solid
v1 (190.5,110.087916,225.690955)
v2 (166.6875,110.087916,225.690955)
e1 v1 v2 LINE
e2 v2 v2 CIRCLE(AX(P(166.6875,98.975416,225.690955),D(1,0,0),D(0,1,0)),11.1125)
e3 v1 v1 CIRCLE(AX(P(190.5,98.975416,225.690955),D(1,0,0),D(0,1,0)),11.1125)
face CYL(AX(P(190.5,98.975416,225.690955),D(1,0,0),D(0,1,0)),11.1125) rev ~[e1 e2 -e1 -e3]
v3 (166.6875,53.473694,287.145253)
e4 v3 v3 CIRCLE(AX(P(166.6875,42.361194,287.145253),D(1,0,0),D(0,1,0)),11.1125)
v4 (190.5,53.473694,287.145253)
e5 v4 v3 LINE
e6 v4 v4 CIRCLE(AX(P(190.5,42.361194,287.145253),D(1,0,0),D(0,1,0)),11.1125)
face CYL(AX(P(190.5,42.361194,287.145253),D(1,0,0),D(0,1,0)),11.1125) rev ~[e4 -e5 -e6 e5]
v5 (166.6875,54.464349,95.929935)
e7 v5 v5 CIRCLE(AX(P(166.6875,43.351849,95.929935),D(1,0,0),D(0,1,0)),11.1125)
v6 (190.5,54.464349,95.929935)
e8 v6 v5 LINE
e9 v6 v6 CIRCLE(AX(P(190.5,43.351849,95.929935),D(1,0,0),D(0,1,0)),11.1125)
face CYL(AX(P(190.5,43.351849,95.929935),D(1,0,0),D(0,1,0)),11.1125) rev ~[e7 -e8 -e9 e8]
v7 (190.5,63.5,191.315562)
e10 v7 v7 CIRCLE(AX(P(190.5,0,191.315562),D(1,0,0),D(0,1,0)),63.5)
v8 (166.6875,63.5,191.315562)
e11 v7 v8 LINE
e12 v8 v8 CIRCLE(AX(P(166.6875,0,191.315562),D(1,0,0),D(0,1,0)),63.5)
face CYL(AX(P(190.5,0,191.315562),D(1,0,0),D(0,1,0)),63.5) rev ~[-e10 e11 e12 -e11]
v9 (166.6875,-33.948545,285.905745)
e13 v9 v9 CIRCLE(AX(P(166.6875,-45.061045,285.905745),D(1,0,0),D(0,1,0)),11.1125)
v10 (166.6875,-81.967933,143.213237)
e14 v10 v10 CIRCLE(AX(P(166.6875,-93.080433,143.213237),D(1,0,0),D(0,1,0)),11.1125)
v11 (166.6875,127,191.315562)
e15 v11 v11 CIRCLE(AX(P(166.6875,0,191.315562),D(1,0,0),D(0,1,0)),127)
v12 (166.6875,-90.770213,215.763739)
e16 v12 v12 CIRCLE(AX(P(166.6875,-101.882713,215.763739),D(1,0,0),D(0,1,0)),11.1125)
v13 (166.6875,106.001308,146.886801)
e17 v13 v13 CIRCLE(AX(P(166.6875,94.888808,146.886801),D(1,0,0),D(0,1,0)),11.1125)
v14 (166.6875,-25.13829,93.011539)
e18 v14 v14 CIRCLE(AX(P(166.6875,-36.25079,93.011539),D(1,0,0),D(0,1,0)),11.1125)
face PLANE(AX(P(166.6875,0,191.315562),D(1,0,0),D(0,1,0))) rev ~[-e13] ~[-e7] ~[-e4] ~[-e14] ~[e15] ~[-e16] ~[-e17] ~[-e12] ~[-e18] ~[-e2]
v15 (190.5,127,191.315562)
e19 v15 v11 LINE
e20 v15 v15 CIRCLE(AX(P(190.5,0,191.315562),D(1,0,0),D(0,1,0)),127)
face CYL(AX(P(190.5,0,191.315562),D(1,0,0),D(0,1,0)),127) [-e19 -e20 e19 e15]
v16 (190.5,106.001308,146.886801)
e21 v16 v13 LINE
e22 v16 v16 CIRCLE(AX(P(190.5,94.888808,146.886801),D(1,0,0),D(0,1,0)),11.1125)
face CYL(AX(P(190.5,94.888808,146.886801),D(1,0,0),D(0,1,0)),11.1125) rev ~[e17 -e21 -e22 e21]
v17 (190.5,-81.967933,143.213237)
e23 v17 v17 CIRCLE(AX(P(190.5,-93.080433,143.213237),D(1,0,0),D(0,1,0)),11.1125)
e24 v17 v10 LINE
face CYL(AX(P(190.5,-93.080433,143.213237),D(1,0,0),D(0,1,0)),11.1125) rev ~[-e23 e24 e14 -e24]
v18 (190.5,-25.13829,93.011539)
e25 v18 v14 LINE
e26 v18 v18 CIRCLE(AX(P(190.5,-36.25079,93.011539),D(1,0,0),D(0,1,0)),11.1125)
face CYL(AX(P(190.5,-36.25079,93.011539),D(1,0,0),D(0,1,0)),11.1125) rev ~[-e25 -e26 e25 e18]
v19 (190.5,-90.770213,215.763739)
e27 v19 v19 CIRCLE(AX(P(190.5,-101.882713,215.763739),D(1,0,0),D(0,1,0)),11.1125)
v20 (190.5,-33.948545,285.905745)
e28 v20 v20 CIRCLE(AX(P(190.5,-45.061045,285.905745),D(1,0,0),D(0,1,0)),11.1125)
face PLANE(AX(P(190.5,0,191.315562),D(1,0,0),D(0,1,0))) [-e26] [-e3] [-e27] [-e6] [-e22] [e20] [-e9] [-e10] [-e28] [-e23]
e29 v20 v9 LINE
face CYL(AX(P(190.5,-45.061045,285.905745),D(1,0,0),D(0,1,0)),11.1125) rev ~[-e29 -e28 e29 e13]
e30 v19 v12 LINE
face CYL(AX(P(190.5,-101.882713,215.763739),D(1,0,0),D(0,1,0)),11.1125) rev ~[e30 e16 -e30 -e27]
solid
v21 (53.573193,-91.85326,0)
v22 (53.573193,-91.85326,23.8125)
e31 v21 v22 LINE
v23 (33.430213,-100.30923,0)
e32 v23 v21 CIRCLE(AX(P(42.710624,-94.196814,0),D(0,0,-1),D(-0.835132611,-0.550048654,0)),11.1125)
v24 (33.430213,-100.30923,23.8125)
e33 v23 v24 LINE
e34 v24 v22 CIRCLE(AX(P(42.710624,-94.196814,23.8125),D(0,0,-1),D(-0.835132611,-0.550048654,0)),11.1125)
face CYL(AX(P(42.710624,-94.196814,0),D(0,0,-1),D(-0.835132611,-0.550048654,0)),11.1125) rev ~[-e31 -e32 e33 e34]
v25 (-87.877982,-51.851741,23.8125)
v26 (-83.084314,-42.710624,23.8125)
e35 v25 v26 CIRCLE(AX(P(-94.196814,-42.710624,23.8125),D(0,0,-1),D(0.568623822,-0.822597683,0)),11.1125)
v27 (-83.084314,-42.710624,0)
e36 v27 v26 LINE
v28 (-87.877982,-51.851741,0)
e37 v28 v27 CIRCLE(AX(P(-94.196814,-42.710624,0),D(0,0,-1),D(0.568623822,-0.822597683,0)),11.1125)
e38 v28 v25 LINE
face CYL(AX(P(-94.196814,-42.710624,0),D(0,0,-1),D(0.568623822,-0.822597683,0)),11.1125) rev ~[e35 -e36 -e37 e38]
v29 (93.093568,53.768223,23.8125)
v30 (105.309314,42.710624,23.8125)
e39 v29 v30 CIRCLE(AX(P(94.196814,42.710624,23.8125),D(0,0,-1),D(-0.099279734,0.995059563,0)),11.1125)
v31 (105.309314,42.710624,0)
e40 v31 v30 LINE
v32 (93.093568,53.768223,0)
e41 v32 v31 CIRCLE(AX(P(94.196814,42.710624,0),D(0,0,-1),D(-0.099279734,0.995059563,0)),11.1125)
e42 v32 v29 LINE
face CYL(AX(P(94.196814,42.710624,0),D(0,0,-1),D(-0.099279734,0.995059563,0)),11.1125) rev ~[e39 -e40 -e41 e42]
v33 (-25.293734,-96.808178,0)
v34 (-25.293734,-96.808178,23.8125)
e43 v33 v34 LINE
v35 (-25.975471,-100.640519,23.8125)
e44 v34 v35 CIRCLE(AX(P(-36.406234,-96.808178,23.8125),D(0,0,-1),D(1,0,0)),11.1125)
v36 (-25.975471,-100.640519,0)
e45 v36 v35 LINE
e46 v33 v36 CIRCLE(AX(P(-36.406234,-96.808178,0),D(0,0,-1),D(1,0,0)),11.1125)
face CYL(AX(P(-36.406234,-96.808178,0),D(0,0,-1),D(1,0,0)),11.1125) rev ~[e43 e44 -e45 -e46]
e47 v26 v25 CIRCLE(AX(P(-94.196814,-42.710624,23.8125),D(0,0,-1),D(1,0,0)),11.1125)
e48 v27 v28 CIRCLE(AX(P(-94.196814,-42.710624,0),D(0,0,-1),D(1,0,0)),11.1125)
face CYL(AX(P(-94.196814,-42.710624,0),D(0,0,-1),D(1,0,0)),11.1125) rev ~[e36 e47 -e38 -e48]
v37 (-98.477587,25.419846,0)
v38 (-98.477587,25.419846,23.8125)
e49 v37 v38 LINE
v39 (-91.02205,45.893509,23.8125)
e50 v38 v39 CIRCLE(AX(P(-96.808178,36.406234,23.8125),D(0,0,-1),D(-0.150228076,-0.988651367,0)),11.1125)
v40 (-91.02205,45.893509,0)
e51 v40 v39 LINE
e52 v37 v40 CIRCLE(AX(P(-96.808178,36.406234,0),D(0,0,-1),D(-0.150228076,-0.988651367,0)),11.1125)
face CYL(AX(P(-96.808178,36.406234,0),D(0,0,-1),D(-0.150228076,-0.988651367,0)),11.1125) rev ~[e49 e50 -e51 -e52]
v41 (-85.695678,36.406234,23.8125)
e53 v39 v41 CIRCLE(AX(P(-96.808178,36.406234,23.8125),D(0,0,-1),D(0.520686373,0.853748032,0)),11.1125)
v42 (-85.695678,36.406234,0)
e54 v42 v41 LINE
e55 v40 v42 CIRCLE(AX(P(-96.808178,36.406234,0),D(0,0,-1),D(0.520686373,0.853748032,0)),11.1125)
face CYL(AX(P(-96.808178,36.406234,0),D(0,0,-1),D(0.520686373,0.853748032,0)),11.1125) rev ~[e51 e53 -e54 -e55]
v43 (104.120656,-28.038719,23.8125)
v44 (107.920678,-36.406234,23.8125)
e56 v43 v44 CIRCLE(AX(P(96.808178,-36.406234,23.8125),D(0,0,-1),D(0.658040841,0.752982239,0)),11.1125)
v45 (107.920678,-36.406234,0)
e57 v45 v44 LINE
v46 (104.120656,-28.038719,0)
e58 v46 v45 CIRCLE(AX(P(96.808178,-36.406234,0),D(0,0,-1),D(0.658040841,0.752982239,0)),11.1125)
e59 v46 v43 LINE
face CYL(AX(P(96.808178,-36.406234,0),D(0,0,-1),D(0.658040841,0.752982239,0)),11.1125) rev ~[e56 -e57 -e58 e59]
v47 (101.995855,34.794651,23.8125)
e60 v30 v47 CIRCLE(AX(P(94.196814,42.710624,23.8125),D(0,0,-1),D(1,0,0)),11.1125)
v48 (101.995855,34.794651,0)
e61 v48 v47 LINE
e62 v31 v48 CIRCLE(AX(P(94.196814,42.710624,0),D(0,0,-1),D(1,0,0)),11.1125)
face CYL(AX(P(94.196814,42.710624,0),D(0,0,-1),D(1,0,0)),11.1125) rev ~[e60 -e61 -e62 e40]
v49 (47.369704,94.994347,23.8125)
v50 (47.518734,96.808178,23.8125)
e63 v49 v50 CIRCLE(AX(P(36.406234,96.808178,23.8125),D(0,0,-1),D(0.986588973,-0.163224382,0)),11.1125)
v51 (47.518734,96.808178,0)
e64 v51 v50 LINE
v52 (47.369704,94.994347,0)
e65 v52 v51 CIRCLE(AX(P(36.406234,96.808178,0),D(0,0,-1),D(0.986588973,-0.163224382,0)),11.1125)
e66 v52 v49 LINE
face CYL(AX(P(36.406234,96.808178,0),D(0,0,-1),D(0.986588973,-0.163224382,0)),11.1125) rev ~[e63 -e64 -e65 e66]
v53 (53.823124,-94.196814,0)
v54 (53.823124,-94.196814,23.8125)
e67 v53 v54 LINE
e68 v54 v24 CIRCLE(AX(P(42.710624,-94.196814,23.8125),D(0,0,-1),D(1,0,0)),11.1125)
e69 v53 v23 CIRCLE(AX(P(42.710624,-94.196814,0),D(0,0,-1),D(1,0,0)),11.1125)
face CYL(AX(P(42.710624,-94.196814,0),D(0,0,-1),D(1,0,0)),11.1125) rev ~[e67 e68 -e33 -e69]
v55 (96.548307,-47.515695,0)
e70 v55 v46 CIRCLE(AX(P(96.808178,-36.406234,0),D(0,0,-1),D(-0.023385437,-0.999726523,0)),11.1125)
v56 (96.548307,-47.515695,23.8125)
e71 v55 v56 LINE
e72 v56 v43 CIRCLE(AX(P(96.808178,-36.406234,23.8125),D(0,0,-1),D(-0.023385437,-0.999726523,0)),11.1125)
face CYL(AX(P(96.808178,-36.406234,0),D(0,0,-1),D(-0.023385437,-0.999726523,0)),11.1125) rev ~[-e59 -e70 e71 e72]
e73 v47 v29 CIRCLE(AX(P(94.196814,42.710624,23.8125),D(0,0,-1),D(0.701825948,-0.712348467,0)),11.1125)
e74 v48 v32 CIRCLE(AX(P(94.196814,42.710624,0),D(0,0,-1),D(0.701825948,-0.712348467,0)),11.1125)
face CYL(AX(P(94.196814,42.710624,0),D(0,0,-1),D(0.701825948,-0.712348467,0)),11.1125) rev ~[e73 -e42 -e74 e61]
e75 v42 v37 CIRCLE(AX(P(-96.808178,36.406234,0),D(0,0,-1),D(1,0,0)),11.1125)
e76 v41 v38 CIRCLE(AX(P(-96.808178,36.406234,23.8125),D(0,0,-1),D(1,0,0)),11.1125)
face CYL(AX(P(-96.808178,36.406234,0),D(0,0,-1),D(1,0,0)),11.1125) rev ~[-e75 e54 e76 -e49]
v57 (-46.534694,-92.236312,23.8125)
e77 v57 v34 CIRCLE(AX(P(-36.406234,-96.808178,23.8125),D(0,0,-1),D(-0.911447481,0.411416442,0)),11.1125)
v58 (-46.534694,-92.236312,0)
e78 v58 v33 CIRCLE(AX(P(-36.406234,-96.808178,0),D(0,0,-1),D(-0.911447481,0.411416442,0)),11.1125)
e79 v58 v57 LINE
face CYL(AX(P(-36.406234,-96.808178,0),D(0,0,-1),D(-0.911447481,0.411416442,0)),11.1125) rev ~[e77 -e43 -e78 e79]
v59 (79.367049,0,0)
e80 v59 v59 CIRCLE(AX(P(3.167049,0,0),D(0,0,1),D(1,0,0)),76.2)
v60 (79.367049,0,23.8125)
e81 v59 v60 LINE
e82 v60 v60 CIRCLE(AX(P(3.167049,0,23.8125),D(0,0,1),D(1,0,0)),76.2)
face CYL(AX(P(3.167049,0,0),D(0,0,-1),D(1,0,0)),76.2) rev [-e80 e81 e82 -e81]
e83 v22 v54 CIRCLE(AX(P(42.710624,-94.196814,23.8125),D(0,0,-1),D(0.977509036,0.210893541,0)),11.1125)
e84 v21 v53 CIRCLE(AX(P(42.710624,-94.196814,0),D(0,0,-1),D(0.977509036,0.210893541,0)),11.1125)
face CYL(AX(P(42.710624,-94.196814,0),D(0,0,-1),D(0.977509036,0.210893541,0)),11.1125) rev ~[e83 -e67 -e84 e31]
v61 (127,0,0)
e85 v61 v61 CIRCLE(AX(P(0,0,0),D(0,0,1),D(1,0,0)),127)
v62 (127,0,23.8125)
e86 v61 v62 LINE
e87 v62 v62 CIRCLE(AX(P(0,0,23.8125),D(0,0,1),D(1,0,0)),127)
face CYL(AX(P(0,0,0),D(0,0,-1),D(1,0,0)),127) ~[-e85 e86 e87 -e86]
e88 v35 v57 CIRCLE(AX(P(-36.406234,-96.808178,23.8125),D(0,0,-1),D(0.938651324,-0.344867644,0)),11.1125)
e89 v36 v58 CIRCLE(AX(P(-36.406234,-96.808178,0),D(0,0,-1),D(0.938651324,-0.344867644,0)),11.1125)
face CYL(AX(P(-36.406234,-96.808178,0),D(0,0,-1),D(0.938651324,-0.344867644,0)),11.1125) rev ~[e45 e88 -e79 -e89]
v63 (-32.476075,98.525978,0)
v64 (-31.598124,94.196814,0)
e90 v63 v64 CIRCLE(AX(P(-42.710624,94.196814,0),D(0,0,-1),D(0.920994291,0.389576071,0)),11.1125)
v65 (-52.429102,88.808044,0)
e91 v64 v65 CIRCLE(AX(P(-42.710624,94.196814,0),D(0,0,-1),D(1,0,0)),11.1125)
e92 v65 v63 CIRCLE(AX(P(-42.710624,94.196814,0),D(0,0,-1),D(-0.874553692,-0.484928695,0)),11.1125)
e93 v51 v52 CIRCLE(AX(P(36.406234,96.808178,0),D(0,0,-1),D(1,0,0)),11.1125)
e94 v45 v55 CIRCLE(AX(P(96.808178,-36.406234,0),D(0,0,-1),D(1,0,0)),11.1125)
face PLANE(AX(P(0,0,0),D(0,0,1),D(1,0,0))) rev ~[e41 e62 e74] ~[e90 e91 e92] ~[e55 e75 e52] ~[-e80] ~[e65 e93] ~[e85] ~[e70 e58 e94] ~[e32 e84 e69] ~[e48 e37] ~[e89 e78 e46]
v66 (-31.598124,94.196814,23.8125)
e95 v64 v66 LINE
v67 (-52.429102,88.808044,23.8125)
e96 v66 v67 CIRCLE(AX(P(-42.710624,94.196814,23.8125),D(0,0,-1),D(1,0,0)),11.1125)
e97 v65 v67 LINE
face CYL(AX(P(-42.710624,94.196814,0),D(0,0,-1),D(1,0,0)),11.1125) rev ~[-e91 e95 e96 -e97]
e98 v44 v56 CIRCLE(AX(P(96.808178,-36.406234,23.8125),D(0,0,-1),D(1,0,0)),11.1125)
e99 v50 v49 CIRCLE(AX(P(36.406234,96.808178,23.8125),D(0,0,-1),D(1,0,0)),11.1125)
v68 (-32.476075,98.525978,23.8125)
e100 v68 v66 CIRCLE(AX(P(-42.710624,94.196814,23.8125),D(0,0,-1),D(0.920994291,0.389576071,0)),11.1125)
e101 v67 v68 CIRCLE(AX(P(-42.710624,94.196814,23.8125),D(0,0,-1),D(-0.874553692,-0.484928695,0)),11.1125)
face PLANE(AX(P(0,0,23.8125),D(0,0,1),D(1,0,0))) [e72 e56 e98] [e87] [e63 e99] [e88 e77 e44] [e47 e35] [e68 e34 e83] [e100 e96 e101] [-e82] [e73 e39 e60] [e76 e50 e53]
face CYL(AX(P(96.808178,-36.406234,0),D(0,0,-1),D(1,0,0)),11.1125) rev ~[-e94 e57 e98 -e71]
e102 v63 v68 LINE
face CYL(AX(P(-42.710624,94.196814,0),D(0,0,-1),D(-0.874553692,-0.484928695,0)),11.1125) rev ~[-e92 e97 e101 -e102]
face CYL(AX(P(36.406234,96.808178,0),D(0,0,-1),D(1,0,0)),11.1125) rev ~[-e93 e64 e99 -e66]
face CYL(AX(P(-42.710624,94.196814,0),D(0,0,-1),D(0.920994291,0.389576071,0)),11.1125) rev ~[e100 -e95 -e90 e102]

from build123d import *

# Parameters (mm, degrees)
F0_R     = 127
F0_R_2   = 76.2
F1_DEPTH = 23.8125
F4_R     = 127
F4_R_2   = 11.1125
F4_R_3   = 63.5
F5_DEPTH = 23.8125


# Not quite as in the source:
# - the program builds the solid bodies; features that only make, move or delete a surface that nothing else refers to are left out


with BuildPart() as f1:
    # F0 (on Top) → F1 (new body)
    with BuildSketch(Plane.XY):
        Circle(F0_R)
        with BuildLine():
            ThreePointArc((101.9958548396, 34.7946514115), (106.4448025713, 17.6495395986), (107.942049028, 0))
            ThreePointArc((107.942049028, 0), (106.9823052387, -14.1489647287), (104.120656465, -28.03871913))
            ThreePointArc((104.120656465, -28.03871913), (106.9261709336, -31.8112513898), (107.920677619, -36.4062342556))
            ThreePointArc((107.920677619, -36.4062342556), (104.5734800406, -44.3553055569), (96.548306946, -47.5156952454))
            ThreePointArc((96.548306946, -47.5156952454), (78.4010780991, -72.9221605187), (53.5731929065, -91.8532595192))
            ThreePointArc((53.5731929065, -91.8532595192), (53.7604643817, -93.0183920588), (53.8231237491, -94.1968139884))
            ThreePointArc((53.8231237491, -94.1968139884), (45.9011634738, -104.8414423292), (33.4302126102, -100.3092296601))
            ThreePointArc((33.4302126102, -100.3092296601), (3.751342164, -104.7733707892), (-25.9754714164, -100.6405193108))
            ThreePointArc((-25.9754714164, -100.6405193108), (-40.6110553172, -107.0944371963), (-46.5346943911, -92.2363124052))
            ThreePointArc((-46.5346943911, -92.2363124052), (-70.0459417897, -74.9510413572), (-87.8779817622, -51.8517405051))
            ThreePointArc((-87.8779817622, -51.8517405051), (-104.373234586, -47.1747160498), (-96.6430601698, -31.8707189585))
            ThreePointArc((-96.6430601698, -31.8707189585), (-101.5542755055, -3.3533286372), (-98.4775871181, 25.4198459422))
            ThreePointArc((-98.4775871181, 25.4198459422), (-107.24989988, 40.2086140993), (-91.0220503046, 45.893509257))
            ThreePointArc((-91.0220503046, 45.893509257), (-74.7387890105, 70.0605525565), (-52.4291016529, 88.8080438613))
            ThreePointArc((-52.4291016529, 88.8080438613), (-47.5764375285, 104.187385169), (-32.4760746868, 98.5259780812))
            ThreePointArc((-32.4760746868, 98.5259780812), (-3.176203782, 104.5828081894), (26.6409177774, 102.1115963588))
            ThreePointArc((26.6409177774, 102.1115963588), (39.1421597741, 107.5786171554), (47.5187342556, 96.808177619))
            ThreePointArc((47.5187342556, 96.808177619), (47.4814140774, 95.8982061001), (47.3697042146, 94.994346671))
            ThreePointArc((47.3697042146, 94.994346671), (73.3279865341, 77.8154449532), (93.0935679461, 53.7682231459))
            ThreePointArc((93.0935679461, 53.7682231459), (101.6542879107, 50.9491757425), (105.3093139884, 42.7106237491))
            ThreePointArc((105.3093139884, 42.7106237491), (104.4475334195, 38.4198886844), (101.9958548396, 34.7946514115))
        make_face(mode=Mode.SUBTRACT)
        with BuildLine():
            ThreePointArc((104.120656465, -28.03871913), (106.9823052387, -14.1489647287), (107.942049028, 0))
            ThreePointArc((107.942049028, 0), (106.4448025713, 17.6495395986), (101.9958548396, 34.7946514115))
            ThreePointArc((101.9958548396, 34.7946514115), (84.1366190041, 37.9904401586), (93.0935679461, 53.7682231459))
            ThreePointArc((93.0935679461, 53.7682231459), (73.3279865341, 77.8154449532), (47.3697042146, 94.994346671))
            ThreePointArc((47.3697042146, 94.994346671), (32.7975359141, 86.2979467686), (26.6409177774, 102.1115963588))
            ThreePointArc((26.6409177774, 102.1115963588), (-3.176203782, 104.5828081894), (-32.4760746868, 98.5259780812))
            ThreePointArc((-32.4760746868, 98.5259780812), (-31.8198229818, 96.4054594778), (-31.5981237491, 94.1968139884))
            ThreePointArc((-31.5981237491, 94.1968139884), (-39.9275435721, 83.4384627681), (-52.4291016529, 88.8080438613))
            ThreePointArc((-52.4291016529, 88.8080438613), (-74.7387890105, 70.0605525565), (-91.0220503046, 45.893509257))
            ThreePointArc((-91.0220503046, 45.893509257), (-87.1183376815, 41.8463315189), (-85.695677619, 36.4062342556))
            ThreePointArc((-85.695677619, 36.4062342556), (-89.5646859475, 27.9789283603), (-98.4775871181, 25.4198459422))
            ThreePointArc((-98.4775871181, 25.4198459422), (-101.5542755055, -3.3533286372), (-96.6430601698, -31.8707189585))
            ThreePointArc((-96.6430601698, -31.8707189585), (-87.2576589404, -34.031004894), (-83.0843139884, -42.7106237491))
            ThreePointArc((-83.0843139884, -42.7106237491), (-84.3554299555, -47.8715167502), (-87.8779817622, -51.8517405051))
            ThreePointArc((-87.8779817622, -51.8517405051), (-70.0459417897, -74.9510413572), (-46.5346943911, -92.2363124052))
            ThreePointArc((-46.5346943911, -92.2363124052), (-34.067950377, -85.9444726915), (-25.2937342556, -96.808177619))
            ThreePointArc((-25.2937342556, -96.808177619), (-25.4654959739, -98.7544309683), (-25.9754714164, -100.6405193108))
            ThreePointArc((-25.9754714164, -100.6405193108), (3.751342164, -104.7733707892), (33.4302126102, -100.3092296601))
            ThreePointArc((33.4302126102, -100.3092296601), (38.4092677124, -83.9505467415), (53.5731929065, -91.8532595192))
            ThreePointArc((53.5731929065, -91.8532595192), (78.4010780991, -72.9221605187), (96.548306946, -47.5156952454))
            ThreePointArc((96.548306946, -47.5156952454), (86.45091108, -32.3794879152), (104.120656465, -28.03871913))
        make_face()
        with Locations((3.167049028, 0)):
            Circle(F0_R_2, mode=Mode.SUBTRACT)
    extrude(amount=F1_DEPTH)


with BuildPart() as f5:
    # F4 (on offset) → F5 (new body)
    with BuildSketch(Plane.YZ.offset(190.5)):
        with Locations((0, 191.315561533)):
            Circle(F4_R)
        with Locations((-36.2507900525, 93.011539003)):
            Circle(F4_R_2, mode=Mode.SUBTRACT)
        with Locations((-93.0804328953, 143.21323688)):
            Circle(F4_R_2, mode=Mode.SUBTRACT)
        with Locations((43.3518492061, 95.9299347572)):
            Circle(F4_R_2, mode=Mode.SUBTRACT)
        with Locations((94.8888080869, 146.8868014237)):
            Circle(F4_R_2, mode=Mode.SUBTRACT)
        with Locations((-101.882713284, 215.7637385384)):
            Circle(F4_R_2, mode=Mode.SUBTRACT)
        with Locations((-45.0610448925, 285.9057452636)):
            Circle(F4_R_2, mode=Mode.SUBTRACT)
        with Locations((0, 191.315561533)):
            Circle(F4_R_3, mode=Mode.SUBTRACT)
        with Locations((98.9754160548, 225.6909545021)):
            Circle(F4_R_2, mode=Mode.SUBTRACT)
        with Locations((42.3611944988, 287.1452533077)):
            Circle(F4_R_2, mode=Mode.SUBTRACT)
    extrude(amount=-F5_DEPTH)


solid = Compound([f1.part, f5.part])
